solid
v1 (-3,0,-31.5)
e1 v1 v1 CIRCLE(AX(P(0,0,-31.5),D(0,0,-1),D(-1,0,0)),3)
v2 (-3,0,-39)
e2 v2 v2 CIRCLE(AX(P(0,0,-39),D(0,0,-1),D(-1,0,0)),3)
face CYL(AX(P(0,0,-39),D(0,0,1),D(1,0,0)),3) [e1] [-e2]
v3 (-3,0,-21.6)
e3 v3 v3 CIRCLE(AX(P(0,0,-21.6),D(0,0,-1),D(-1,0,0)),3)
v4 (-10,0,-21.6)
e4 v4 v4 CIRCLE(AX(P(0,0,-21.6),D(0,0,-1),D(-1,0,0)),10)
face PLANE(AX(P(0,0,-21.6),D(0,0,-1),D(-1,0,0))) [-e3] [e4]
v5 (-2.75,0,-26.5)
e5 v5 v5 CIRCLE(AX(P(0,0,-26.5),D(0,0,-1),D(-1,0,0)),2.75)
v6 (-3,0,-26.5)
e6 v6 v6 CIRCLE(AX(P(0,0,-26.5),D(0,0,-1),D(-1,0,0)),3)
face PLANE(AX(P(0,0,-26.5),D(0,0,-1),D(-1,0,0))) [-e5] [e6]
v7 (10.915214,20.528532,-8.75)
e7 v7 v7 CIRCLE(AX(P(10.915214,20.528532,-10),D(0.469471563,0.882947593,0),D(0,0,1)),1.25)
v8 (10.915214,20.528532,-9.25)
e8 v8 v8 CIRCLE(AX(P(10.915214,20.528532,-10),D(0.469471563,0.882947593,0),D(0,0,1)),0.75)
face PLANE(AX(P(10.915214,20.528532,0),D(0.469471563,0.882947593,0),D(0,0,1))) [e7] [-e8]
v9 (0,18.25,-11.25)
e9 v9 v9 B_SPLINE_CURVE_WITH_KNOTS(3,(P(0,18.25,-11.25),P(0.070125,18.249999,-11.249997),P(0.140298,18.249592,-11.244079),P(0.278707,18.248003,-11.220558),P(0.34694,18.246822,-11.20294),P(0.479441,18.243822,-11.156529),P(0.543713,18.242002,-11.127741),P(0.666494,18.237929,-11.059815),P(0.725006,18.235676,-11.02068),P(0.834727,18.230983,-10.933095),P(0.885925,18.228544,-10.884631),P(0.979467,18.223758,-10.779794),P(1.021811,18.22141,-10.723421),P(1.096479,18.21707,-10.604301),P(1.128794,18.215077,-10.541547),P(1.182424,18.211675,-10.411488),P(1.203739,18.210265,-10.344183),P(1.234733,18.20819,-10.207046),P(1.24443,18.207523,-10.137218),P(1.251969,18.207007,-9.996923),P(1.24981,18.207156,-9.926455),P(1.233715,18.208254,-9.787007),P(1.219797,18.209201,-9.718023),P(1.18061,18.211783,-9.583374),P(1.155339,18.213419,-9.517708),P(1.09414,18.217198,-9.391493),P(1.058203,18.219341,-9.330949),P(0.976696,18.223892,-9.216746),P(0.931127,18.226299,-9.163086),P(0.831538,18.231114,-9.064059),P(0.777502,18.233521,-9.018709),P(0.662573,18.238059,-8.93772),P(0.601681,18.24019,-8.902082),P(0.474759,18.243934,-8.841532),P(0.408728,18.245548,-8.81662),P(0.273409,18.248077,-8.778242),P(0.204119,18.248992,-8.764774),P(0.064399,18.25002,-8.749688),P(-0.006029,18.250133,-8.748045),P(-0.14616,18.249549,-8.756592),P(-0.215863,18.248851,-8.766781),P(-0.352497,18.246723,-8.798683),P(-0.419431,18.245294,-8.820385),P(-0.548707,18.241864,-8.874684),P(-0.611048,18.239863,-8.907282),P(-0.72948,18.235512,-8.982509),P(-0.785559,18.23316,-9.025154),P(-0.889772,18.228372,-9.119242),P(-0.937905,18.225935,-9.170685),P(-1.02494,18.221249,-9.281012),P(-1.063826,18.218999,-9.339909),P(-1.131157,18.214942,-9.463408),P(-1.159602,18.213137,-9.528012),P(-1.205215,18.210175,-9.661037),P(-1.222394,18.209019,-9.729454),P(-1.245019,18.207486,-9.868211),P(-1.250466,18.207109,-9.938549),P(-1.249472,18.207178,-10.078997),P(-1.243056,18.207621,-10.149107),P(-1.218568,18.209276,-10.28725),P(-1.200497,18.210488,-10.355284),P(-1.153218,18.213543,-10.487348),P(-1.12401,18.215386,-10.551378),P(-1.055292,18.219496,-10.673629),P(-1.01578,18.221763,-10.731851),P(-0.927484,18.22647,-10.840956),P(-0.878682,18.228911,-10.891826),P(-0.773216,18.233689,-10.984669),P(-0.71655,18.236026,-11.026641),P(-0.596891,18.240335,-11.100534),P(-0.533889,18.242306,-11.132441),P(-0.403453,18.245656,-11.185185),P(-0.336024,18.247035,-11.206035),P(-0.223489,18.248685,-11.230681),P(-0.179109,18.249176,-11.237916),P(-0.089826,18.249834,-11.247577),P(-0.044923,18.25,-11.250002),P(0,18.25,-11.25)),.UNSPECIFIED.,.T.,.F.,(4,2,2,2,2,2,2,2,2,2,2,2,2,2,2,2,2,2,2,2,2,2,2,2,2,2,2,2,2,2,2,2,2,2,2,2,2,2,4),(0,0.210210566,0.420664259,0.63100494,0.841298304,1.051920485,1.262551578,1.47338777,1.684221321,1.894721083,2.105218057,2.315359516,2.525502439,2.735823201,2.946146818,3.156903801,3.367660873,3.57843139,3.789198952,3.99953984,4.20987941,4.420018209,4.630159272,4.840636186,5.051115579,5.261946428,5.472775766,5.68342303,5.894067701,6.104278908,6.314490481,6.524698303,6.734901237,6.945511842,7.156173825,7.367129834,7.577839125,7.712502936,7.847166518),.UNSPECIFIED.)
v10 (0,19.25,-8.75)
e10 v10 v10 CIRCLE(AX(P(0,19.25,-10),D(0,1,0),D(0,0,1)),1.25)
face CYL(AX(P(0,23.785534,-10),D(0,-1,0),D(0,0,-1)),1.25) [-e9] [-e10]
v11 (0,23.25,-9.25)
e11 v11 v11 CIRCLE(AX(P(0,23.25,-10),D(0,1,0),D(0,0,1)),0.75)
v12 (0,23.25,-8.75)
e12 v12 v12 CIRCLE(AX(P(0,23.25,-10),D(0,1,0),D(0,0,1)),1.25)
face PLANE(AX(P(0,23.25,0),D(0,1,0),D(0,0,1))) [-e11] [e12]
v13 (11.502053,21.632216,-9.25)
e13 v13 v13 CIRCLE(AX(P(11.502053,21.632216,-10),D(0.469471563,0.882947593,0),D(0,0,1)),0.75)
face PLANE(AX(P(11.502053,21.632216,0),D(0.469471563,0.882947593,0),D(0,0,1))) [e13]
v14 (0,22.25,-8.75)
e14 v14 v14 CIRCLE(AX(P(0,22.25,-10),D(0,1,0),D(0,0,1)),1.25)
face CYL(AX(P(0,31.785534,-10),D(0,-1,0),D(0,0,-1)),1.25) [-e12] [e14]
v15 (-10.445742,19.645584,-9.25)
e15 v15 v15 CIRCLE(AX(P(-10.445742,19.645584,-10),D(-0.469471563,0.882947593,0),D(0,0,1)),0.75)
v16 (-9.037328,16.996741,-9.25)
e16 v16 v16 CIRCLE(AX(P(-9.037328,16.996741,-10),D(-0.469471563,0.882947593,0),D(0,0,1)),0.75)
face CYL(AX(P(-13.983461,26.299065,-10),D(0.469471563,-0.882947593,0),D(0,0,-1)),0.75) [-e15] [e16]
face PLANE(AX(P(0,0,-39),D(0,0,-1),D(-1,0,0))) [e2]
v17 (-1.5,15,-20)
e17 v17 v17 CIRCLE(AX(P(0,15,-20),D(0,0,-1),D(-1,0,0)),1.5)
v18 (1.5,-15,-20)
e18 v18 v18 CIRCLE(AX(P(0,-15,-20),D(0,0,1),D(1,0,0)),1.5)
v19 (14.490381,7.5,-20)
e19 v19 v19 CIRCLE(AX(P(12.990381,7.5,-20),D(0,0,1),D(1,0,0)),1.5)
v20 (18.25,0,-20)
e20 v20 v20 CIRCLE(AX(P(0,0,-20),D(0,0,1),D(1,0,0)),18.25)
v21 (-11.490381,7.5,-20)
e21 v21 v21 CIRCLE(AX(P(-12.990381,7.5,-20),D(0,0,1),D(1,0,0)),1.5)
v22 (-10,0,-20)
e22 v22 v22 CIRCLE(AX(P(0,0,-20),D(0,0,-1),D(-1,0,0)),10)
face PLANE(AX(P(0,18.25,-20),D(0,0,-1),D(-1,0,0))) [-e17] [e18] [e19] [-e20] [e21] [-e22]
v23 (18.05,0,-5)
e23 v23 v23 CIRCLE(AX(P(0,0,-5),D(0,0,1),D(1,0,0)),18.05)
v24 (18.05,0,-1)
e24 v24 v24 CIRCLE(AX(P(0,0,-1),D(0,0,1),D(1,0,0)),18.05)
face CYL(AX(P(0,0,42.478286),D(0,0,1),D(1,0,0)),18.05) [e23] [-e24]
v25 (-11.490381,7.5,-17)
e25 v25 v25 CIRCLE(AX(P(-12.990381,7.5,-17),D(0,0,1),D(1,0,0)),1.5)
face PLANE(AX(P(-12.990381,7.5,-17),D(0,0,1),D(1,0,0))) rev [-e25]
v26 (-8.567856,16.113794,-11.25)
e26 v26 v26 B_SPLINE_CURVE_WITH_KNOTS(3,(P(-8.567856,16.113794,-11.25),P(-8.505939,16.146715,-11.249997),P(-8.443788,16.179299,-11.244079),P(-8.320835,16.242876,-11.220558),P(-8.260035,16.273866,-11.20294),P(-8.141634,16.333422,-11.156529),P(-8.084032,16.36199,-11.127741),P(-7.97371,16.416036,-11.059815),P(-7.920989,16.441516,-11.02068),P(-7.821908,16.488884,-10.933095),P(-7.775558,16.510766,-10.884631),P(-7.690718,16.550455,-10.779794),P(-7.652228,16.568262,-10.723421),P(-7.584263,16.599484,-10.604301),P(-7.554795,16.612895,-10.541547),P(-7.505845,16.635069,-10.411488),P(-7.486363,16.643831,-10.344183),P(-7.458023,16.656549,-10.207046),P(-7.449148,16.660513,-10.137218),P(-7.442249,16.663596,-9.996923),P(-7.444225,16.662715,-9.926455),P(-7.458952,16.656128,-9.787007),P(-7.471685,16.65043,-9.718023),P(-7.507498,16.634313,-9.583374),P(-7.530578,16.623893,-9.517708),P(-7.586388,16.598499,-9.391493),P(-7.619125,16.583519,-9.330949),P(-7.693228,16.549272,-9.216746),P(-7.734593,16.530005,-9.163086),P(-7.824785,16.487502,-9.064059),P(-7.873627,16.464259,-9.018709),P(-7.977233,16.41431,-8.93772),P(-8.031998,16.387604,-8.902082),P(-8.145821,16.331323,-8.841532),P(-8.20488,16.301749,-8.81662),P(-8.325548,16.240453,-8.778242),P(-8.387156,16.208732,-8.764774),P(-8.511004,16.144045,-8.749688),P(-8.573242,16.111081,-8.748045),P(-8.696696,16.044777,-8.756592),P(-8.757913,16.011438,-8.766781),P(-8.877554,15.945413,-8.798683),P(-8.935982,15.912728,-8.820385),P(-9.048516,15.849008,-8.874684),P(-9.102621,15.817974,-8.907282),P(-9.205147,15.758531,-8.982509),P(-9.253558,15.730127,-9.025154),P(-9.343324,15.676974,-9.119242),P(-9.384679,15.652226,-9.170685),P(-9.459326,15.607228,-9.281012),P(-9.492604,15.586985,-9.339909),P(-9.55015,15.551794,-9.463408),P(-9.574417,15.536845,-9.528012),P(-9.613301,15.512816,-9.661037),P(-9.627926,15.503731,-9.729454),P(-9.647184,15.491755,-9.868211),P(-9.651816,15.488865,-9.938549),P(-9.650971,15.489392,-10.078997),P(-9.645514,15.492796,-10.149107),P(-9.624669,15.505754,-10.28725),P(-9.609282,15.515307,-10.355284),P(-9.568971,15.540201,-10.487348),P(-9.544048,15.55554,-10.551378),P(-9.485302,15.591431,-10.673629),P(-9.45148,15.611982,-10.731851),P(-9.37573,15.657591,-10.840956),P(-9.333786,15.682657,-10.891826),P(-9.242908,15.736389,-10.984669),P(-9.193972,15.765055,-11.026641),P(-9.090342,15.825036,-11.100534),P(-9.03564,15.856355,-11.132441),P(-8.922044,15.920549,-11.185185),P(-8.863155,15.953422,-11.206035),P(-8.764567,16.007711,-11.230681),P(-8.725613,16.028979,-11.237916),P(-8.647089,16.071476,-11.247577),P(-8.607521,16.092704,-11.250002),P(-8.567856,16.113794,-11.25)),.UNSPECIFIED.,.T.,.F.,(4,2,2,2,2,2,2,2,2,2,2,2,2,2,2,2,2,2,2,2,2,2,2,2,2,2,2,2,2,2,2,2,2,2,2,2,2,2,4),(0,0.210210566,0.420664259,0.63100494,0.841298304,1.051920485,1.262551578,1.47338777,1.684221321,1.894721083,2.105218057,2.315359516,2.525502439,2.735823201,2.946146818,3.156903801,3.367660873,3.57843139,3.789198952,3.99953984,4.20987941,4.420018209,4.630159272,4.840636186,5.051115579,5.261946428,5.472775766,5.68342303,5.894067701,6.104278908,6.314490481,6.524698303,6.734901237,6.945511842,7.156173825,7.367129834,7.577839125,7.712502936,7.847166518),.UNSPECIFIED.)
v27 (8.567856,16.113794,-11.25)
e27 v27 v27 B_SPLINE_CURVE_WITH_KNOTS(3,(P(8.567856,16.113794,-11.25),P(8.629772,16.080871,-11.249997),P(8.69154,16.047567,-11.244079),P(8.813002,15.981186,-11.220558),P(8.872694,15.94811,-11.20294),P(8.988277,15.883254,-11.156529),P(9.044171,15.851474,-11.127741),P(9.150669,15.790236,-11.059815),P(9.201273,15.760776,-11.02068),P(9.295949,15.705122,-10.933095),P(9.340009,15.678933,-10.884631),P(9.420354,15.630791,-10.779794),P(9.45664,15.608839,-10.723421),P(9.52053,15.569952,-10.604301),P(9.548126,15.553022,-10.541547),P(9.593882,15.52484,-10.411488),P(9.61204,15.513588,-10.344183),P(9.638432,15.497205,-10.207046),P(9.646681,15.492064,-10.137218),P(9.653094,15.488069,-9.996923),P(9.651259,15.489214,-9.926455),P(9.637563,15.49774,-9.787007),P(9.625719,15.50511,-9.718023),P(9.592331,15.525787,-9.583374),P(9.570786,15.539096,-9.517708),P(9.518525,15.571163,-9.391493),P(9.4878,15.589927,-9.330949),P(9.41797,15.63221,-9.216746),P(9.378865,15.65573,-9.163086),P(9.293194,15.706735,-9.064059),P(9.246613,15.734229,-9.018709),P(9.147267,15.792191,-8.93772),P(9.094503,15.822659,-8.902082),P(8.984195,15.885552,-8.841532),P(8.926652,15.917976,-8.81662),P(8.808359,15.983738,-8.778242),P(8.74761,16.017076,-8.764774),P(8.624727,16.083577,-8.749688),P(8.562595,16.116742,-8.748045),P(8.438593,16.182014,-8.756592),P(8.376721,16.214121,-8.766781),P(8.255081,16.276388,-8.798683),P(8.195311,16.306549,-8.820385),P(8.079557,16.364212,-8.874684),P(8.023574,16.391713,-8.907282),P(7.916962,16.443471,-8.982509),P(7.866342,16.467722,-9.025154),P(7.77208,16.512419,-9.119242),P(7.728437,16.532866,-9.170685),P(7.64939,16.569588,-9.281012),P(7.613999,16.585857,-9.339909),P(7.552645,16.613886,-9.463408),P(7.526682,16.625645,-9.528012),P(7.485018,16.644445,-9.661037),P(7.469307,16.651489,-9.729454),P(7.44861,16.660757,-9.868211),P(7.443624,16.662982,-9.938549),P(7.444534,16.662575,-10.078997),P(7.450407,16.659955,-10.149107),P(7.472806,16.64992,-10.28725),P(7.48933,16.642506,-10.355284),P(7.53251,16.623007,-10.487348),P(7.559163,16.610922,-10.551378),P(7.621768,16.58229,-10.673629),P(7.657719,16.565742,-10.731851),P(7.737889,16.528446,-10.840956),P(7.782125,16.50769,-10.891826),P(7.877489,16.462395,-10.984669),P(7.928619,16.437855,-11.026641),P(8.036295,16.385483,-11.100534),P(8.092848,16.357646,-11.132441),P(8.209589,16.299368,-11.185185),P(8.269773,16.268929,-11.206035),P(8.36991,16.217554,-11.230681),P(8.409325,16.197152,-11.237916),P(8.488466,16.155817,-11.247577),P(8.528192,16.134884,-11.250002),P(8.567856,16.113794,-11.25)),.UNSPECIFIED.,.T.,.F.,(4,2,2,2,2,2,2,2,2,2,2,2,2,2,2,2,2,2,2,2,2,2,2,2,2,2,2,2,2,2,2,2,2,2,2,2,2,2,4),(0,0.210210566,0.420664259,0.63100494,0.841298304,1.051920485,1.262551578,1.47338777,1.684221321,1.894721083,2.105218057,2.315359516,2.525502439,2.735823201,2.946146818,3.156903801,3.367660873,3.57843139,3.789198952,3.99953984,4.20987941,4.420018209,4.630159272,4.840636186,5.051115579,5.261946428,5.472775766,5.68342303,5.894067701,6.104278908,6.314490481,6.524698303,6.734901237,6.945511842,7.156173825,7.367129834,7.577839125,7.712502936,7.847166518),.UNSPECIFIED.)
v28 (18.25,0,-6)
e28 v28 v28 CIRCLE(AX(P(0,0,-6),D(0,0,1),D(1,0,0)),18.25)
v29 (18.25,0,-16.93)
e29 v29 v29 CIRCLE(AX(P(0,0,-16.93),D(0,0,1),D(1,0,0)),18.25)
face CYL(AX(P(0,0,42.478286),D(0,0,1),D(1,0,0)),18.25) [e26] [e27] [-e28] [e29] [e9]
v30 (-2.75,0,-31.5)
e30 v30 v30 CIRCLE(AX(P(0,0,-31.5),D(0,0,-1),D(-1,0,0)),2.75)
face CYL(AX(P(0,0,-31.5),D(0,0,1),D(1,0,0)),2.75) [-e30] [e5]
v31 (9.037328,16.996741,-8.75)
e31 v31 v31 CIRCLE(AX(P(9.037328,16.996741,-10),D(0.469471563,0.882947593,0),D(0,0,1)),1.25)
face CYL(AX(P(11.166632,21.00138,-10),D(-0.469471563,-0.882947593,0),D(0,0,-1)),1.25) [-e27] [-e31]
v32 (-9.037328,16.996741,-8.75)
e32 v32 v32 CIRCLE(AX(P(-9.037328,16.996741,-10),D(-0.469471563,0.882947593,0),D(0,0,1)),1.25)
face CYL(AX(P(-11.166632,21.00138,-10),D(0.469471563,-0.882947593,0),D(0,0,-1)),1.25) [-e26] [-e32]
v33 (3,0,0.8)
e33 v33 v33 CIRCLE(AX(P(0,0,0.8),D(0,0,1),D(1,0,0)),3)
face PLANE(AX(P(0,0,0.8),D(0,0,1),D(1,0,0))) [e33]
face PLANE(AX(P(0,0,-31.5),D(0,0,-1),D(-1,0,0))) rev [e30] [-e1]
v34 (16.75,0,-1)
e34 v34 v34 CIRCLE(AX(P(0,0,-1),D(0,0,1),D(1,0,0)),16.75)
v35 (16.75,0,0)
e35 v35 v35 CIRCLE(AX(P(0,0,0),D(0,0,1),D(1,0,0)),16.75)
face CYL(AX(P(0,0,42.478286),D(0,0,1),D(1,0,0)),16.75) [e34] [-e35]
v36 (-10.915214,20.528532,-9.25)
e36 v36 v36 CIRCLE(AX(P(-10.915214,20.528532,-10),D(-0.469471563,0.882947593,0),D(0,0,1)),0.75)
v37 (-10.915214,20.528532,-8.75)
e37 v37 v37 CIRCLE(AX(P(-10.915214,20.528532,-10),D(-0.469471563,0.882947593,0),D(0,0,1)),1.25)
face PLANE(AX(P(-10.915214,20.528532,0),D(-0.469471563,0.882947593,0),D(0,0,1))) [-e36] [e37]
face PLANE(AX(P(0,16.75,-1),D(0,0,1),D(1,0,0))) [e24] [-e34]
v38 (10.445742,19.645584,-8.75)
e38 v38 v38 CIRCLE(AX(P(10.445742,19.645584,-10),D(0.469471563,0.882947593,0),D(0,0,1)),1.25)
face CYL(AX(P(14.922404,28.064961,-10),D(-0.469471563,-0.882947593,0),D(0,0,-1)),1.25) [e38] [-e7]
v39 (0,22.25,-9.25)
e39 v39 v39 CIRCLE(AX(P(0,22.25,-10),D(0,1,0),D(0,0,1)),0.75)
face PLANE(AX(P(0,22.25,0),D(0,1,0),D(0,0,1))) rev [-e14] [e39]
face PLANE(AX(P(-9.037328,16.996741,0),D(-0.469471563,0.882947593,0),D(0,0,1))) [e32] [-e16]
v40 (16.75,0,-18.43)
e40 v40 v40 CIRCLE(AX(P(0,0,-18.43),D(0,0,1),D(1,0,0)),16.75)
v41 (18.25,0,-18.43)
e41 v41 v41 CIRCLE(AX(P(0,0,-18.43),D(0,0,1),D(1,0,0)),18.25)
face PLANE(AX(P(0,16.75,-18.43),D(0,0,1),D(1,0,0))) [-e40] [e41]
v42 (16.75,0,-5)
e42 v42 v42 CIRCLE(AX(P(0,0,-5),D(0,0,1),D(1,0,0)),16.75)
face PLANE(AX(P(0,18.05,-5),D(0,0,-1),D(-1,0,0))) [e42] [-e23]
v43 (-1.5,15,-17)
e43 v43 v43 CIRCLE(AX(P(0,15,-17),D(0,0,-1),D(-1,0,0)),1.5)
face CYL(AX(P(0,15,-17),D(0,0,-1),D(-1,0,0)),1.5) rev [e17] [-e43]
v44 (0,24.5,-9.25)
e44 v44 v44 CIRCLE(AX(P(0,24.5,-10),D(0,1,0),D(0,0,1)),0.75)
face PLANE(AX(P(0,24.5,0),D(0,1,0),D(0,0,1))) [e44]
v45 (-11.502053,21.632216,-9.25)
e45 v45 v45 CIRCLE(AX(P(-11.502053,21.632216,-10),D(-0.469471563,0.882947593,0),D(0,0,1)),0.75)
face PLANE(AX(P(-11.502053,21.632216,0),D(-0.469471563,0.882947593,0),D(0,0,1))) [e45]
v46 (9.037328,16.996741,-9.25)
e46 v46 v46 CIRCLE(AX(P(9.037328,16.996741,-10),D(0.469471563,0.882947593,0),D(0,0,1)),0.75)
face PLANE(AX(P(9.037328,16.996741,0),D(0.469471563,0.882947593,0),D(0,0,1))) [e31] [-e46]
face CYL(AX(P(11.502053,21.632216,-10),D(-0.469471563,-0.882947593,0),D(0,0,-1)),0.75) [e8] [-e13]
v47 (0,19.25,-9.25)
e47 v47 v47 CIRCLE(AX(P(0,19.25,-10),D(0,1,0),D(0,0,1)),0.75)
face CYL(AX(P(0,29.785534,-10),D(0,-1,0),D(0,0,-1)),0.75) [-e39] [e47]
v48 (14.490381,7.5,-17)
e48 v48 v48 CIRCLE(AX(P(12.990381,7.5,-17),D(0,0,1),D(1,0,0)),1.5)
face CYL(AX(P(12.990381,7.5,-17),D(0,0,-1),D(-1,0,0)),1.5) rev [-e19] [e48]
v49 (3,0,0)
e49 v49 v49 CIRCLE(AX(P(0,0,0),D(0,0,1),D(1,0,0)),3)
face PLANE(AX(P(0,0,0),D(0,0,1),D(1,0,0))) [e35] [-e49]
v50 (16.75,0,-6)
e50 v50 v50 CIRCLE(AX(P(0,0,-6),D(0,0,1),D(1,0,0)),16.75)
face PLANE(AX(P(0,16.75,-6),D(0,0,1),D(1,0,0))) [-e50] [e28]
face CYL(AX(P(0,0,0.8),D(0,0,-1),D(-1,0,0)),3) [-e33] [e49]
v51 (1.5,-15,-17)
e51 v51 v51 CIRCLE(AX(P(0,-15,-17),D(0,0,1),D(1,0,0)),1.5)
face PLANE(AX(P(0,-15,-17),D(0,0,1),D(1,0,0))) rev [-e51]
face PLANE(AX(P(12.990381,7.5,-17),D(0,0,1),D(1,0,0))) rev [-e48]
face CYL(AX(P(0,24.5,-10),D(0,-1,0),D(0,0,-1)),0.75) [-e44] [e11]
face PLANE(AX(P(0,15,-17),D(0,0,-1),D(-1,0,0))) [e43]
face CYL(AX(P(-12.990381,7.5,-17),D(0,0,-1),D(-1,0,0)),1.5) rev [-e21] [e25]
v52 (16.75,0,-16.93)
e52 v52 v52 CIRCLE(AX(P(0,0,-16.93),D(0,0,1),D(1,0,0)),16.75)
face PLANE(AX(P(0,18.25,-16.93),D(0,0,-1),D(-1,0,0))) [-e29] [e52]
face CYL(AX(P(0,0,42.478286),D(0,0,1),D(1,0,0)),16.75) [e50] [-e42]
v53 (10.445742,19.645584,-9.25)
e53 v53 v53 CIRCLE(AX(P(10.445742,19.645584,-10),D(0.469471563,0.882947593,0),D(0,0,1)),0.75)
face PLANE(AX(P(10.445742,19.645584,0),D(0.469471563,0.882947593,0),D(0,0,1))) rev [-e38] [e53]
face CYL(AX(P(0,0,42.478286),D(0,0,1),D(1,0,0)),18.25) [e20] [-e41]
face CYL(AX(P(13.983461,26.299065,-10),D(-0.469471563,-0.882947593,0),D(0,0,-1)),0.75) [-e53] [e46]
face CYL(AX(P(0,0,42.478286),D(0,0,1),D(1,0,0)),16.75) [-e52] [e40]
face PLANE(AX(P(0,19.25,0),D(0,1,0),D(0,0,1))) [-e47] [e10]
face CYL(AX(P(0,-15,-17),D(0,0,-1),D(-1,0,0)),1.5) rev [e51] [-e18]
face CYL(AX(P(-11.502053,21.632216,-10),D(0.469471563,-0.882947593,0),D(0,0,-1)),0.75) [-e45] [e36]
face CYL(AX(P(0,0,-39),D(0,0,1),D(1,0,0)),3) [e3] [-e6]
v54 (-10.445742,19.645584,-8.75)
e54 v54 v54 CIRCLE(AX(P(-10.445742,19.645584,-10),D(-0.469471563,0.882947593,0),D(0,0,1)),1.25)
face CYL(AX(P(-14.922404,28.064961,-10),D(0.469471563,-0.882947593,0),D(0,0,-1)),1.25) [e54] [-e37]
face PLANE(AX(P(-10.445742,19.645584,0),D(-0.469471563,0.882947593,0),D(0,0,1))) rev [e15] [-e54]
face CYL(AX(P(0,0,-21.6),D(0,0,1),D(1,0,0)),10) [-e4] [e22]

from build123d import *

# Parameters (mm, degrees)
SKETCH_5_R                 = 3
SKETCH_5_R_2               = 2.75
EXTRUDE_3_DEPTH            = 19
SKETCH_5_3_R               = 10
SKETCH_5_3_R_2             = 3
EXTRUDE_4_DEPTH            = 1.6
CUT_EXTRUDE_START          = 6.5
SKETCH_5_4_R               = 3
SKETCH_5_4_R_2             = 2.75
CUT_EXTRUDE_5_DEPTH        = 5
SKETCH_6_R                 = 0.75
EXTRUDE_5_DEPTH            = 24.5
EXTRUDE_START              = 18.207141
SKETCH_6_4_R               = 1.25
SKETCH_6_4_R_2             = 0.75
EXTRUDE_10_DEPTH           = 5.042859
SKETCH_6_5_R               = 1.25
SKETCH_6_5_R_2             = 0.75
CUT_EXTRUDE_6_DEPTH        = 22.25
SKETCH_6_6_R               = 1.25
SKETCH_6_6_R_2             = 0.75
EXTRUDE_11_DEPTH           = 19.25
PATTERN_CIRCULAR_1_ANGLE   = 28
PATTERN_CIRCULAR_1_2_ANGLE = 28
SKETCH_7_R                 = 1.5
CUT_EXTRUDE_7_DEPTH        = 3
EXTRUDE_START_2            = 0.8
SKETCH_8_R                 = 3
EXTRUDE_12_DEPTH           = 0.8


with BuildPart() as part:
    # 草图4 → 旋转1 (revolve)
    with BuildSketch(Plane(origin=(0, 0, 0), x_dir=(0, 0, -1), z_dir=(1, 0, 0)), mode=Mode.PRIVATE) as revolve_1_sk:
        Polygon((0, 0), (0, 16.75), (1, 16.75), (1, 18.05), (5, 18.05), (5, 16.75), (6, 16.75), (6, 18.25), (16.93, 18.25), (16.93, 16.75), (18.43, 16.75), (18.43, 18.25), (20, 18.25), (20, 0), align=None)
    revolve(revolve_1_sk.sketch.rotate(Axis((0, 0, 42.478286457), (0, 0, -1)), 90), axis=Axis((0, 0, 42.478286457), (0, 0, -1)))

    # 草图5 → 凸台-拉伸3 (add)
    # profile 1 of 2: a face of its own
    with BuildSketch(Plane(origin=(0, 0, -20), x_dir=(-1, 0, 0), z_dir=(0, 0, -1))):
        Circle(SKETCH_5_R)
        Circle(SKETCH_5_R_2, mode=Mode.SUBTRACT)
    # profile 2 of 2: a face of its own
    with BuildSketch(Plane(origin=(0, 0, -20), x_dir=(-1, 0, 0), z_dir=(0, 0, -1))):
        Circle(SKETCH_5_R_2)
    extrude(amount=EXTRUDE_3_DEPTH)

    # 草图5<3> → 凸台-拉伸4 (add)
    with BuildSketch(Plane(origin=(0, 0, -20), x_dir=(-1, 0, 0), z_dir=(0, 0, -1))):
        Circle(SKETCH_5_3_R)
        Circle(SKETCH_5_3_R_2, mode=Mode.SUBTRACT)
    extrude(amount=EXTRUDE_4_DEPTH)

    # 草图5<4> → 切除-拉伸5 (cut)
    with BuildSketch(Plane(origin=(0, 0, -20), x_dir=(-1, 0, 0), z_dir=(0, 0, -1)).offset(CUT_EXTRUDE_START)):
        Circle(SKETCH_5_4_R)
        Circle(SKETCH_5_4_R_2, mode=Mode.SUBTRACT)
    extrude(amount=CUT_EXTRUDE_5_DEPTH, mode=Mode.SUBTRACT)

    # 草图6 → 凸台-拉伸5 (add)
    with BuildSketch(Plane(origin=(0, 0, 0), x_dir=(1, 0, 0), z_dir=(0, 1, 0))):
        with Locations(Location((0, 10, 0), (0, 0, 90))):
            Circle(SKETCH_6_R)
    extrude(amount=EXTRUDE_5_DEPTH)

    # 草图6<4> → 凸台-拉伸10 (add)
    with BuildSketch(Plane(origin=(0, 0, 0), x_dir=(1, 0, 0), z_dir=(0, 1, 0)).offset(EXTRUDE_START)):
        with Locations(Location((0, 10, 0), (0, 0, 90))):
            Circle(SKETCH_6_4_R)
        with Locations(Location((0, 10, 0), (0, 0, 270))):
            Circle(SKETCH_6_4_R_2, mode=Mode.SUBTRACT)
    extrude(amount=EXTRUDE_10_DEPTH)

    # 草图6<5> → 切除-拉伸6 (cut)
    with BuildSketch(Plane(origin=(0, 0, 0), x_dir=(1, 0, 0), z_dir=(0, 1, 0))):
        with Locations(Location((0, 10, 0), (0, 0, 90))):
            Circle(SKETCH_6_5_R)
        with Locations(Location((0, 10, 0), (0, 0, 270))):
            Circle(SKETCH_6_5_R_2, mode=Mode.SUBTRACT)
    extrude(amount=CUT_EXTRUDE_6_DEPTH, mode=Mode.SUBTRACT)

    # 草图6<6> → 凸台-拉伸11 (add)
    with BuildSketch(Plane(origin=(0, 0, 0), x_dir=(1, 0, 0), z_dir=(0, 1, 0))):
        with Locations(Location((0, 10, 0), (0, 0, 90))):
            Circle(SKETCH_6_6_R)
        with Locations(Location((0, 10, 0), (0, 0, 270))):
            Circle(SKETCH_6_6_R_2, mode=Mode.SUBTRACT)
    extrude(amount=EXTRUDE_11_DEPTH)


with BuildPart() as body_2:
    # 阵列(圆周)1: read off the stored shape, not the designer's step
    # 阵列(圆周)1: copy of part
    add(part.part.rotate(Axis((0, 0, 0), (0, 0, -1)), PATTERN_CIRCULAR_1_ANGLE))


with BuildPart() as body_3:
    # Pattern Circular 1 2: copy of part
    add(part.part.rotate(Axis((0, 0, 0), (0, 0, 1)), PATTERN_CIRCULAR_1_2_ANGLE))


with BuildPart() as cut_extrude_7_tool:
    # 草图7 → 切除-拉伸7 (new body)
    with BuildSketch(Plane(origin=(0, 0, -20), x_dir=(-1, 0, 0), z_dir=(0, 0, -1))):
        with Locations((0, 15)):
            Circle(SKETCH_7_R)
        with Locations(Location((0, -15, 0), (0, 0, 180))):
            Circle(SKETCH_7_R)
        with Locations(Location((-12.990381057, 7.5, 0), (0, 0, 180))):
            Circle(SKETCH_7_R)
        with Locations(Location((12.990381057, 7.5, 0), (0, 0, 180))):
            Circle(SKETCH_7_R)
    extrude(amount=-CUT_EXTRUDE_7_DEPTH)


with BuildPart() as part_1:
    add(part.part)

    # 切除-拉伸7: cut by cut_extrude_7_tool
    add(cut_extrude_7_tool.part, mode=Mode.SUBTRACT)



with BuildPart() as body_2_1:
    add(body_2.part)

    # 切除-拉伸7: cut by cut_extrude_7_tool
    add(cut_extrude_7_tool.part, mode=Mode.SUBTRACT)


with BuildPart() as body_3_1:
    add(body_3.part)

    # 切除-拉伸7: cut by cut_extrude_7_tool
    add(cut_extrude_7_tool.part, mode=Mode.SUBTRACT)


with BuildPart() as part_2:
    add(part_1.part)

    add(body_2_1.part)  # 凸台-拉伸12 merges body 2

    add(body_3_1.part)  # 凸台-拉伸12 merges body 3
    # 草图8 → 凸台-拉伸12 (add)
    with BuildSketch(Plane.XY.offset(EXTRUDE_START_2)):
        with Locations(Location((0, 0, 0), (0, 0, 180))):
            Circle(SKETCH_8_R)
    extrude(amount=-EXTRUDE_12_DEPTH)


solid = part_2.part
